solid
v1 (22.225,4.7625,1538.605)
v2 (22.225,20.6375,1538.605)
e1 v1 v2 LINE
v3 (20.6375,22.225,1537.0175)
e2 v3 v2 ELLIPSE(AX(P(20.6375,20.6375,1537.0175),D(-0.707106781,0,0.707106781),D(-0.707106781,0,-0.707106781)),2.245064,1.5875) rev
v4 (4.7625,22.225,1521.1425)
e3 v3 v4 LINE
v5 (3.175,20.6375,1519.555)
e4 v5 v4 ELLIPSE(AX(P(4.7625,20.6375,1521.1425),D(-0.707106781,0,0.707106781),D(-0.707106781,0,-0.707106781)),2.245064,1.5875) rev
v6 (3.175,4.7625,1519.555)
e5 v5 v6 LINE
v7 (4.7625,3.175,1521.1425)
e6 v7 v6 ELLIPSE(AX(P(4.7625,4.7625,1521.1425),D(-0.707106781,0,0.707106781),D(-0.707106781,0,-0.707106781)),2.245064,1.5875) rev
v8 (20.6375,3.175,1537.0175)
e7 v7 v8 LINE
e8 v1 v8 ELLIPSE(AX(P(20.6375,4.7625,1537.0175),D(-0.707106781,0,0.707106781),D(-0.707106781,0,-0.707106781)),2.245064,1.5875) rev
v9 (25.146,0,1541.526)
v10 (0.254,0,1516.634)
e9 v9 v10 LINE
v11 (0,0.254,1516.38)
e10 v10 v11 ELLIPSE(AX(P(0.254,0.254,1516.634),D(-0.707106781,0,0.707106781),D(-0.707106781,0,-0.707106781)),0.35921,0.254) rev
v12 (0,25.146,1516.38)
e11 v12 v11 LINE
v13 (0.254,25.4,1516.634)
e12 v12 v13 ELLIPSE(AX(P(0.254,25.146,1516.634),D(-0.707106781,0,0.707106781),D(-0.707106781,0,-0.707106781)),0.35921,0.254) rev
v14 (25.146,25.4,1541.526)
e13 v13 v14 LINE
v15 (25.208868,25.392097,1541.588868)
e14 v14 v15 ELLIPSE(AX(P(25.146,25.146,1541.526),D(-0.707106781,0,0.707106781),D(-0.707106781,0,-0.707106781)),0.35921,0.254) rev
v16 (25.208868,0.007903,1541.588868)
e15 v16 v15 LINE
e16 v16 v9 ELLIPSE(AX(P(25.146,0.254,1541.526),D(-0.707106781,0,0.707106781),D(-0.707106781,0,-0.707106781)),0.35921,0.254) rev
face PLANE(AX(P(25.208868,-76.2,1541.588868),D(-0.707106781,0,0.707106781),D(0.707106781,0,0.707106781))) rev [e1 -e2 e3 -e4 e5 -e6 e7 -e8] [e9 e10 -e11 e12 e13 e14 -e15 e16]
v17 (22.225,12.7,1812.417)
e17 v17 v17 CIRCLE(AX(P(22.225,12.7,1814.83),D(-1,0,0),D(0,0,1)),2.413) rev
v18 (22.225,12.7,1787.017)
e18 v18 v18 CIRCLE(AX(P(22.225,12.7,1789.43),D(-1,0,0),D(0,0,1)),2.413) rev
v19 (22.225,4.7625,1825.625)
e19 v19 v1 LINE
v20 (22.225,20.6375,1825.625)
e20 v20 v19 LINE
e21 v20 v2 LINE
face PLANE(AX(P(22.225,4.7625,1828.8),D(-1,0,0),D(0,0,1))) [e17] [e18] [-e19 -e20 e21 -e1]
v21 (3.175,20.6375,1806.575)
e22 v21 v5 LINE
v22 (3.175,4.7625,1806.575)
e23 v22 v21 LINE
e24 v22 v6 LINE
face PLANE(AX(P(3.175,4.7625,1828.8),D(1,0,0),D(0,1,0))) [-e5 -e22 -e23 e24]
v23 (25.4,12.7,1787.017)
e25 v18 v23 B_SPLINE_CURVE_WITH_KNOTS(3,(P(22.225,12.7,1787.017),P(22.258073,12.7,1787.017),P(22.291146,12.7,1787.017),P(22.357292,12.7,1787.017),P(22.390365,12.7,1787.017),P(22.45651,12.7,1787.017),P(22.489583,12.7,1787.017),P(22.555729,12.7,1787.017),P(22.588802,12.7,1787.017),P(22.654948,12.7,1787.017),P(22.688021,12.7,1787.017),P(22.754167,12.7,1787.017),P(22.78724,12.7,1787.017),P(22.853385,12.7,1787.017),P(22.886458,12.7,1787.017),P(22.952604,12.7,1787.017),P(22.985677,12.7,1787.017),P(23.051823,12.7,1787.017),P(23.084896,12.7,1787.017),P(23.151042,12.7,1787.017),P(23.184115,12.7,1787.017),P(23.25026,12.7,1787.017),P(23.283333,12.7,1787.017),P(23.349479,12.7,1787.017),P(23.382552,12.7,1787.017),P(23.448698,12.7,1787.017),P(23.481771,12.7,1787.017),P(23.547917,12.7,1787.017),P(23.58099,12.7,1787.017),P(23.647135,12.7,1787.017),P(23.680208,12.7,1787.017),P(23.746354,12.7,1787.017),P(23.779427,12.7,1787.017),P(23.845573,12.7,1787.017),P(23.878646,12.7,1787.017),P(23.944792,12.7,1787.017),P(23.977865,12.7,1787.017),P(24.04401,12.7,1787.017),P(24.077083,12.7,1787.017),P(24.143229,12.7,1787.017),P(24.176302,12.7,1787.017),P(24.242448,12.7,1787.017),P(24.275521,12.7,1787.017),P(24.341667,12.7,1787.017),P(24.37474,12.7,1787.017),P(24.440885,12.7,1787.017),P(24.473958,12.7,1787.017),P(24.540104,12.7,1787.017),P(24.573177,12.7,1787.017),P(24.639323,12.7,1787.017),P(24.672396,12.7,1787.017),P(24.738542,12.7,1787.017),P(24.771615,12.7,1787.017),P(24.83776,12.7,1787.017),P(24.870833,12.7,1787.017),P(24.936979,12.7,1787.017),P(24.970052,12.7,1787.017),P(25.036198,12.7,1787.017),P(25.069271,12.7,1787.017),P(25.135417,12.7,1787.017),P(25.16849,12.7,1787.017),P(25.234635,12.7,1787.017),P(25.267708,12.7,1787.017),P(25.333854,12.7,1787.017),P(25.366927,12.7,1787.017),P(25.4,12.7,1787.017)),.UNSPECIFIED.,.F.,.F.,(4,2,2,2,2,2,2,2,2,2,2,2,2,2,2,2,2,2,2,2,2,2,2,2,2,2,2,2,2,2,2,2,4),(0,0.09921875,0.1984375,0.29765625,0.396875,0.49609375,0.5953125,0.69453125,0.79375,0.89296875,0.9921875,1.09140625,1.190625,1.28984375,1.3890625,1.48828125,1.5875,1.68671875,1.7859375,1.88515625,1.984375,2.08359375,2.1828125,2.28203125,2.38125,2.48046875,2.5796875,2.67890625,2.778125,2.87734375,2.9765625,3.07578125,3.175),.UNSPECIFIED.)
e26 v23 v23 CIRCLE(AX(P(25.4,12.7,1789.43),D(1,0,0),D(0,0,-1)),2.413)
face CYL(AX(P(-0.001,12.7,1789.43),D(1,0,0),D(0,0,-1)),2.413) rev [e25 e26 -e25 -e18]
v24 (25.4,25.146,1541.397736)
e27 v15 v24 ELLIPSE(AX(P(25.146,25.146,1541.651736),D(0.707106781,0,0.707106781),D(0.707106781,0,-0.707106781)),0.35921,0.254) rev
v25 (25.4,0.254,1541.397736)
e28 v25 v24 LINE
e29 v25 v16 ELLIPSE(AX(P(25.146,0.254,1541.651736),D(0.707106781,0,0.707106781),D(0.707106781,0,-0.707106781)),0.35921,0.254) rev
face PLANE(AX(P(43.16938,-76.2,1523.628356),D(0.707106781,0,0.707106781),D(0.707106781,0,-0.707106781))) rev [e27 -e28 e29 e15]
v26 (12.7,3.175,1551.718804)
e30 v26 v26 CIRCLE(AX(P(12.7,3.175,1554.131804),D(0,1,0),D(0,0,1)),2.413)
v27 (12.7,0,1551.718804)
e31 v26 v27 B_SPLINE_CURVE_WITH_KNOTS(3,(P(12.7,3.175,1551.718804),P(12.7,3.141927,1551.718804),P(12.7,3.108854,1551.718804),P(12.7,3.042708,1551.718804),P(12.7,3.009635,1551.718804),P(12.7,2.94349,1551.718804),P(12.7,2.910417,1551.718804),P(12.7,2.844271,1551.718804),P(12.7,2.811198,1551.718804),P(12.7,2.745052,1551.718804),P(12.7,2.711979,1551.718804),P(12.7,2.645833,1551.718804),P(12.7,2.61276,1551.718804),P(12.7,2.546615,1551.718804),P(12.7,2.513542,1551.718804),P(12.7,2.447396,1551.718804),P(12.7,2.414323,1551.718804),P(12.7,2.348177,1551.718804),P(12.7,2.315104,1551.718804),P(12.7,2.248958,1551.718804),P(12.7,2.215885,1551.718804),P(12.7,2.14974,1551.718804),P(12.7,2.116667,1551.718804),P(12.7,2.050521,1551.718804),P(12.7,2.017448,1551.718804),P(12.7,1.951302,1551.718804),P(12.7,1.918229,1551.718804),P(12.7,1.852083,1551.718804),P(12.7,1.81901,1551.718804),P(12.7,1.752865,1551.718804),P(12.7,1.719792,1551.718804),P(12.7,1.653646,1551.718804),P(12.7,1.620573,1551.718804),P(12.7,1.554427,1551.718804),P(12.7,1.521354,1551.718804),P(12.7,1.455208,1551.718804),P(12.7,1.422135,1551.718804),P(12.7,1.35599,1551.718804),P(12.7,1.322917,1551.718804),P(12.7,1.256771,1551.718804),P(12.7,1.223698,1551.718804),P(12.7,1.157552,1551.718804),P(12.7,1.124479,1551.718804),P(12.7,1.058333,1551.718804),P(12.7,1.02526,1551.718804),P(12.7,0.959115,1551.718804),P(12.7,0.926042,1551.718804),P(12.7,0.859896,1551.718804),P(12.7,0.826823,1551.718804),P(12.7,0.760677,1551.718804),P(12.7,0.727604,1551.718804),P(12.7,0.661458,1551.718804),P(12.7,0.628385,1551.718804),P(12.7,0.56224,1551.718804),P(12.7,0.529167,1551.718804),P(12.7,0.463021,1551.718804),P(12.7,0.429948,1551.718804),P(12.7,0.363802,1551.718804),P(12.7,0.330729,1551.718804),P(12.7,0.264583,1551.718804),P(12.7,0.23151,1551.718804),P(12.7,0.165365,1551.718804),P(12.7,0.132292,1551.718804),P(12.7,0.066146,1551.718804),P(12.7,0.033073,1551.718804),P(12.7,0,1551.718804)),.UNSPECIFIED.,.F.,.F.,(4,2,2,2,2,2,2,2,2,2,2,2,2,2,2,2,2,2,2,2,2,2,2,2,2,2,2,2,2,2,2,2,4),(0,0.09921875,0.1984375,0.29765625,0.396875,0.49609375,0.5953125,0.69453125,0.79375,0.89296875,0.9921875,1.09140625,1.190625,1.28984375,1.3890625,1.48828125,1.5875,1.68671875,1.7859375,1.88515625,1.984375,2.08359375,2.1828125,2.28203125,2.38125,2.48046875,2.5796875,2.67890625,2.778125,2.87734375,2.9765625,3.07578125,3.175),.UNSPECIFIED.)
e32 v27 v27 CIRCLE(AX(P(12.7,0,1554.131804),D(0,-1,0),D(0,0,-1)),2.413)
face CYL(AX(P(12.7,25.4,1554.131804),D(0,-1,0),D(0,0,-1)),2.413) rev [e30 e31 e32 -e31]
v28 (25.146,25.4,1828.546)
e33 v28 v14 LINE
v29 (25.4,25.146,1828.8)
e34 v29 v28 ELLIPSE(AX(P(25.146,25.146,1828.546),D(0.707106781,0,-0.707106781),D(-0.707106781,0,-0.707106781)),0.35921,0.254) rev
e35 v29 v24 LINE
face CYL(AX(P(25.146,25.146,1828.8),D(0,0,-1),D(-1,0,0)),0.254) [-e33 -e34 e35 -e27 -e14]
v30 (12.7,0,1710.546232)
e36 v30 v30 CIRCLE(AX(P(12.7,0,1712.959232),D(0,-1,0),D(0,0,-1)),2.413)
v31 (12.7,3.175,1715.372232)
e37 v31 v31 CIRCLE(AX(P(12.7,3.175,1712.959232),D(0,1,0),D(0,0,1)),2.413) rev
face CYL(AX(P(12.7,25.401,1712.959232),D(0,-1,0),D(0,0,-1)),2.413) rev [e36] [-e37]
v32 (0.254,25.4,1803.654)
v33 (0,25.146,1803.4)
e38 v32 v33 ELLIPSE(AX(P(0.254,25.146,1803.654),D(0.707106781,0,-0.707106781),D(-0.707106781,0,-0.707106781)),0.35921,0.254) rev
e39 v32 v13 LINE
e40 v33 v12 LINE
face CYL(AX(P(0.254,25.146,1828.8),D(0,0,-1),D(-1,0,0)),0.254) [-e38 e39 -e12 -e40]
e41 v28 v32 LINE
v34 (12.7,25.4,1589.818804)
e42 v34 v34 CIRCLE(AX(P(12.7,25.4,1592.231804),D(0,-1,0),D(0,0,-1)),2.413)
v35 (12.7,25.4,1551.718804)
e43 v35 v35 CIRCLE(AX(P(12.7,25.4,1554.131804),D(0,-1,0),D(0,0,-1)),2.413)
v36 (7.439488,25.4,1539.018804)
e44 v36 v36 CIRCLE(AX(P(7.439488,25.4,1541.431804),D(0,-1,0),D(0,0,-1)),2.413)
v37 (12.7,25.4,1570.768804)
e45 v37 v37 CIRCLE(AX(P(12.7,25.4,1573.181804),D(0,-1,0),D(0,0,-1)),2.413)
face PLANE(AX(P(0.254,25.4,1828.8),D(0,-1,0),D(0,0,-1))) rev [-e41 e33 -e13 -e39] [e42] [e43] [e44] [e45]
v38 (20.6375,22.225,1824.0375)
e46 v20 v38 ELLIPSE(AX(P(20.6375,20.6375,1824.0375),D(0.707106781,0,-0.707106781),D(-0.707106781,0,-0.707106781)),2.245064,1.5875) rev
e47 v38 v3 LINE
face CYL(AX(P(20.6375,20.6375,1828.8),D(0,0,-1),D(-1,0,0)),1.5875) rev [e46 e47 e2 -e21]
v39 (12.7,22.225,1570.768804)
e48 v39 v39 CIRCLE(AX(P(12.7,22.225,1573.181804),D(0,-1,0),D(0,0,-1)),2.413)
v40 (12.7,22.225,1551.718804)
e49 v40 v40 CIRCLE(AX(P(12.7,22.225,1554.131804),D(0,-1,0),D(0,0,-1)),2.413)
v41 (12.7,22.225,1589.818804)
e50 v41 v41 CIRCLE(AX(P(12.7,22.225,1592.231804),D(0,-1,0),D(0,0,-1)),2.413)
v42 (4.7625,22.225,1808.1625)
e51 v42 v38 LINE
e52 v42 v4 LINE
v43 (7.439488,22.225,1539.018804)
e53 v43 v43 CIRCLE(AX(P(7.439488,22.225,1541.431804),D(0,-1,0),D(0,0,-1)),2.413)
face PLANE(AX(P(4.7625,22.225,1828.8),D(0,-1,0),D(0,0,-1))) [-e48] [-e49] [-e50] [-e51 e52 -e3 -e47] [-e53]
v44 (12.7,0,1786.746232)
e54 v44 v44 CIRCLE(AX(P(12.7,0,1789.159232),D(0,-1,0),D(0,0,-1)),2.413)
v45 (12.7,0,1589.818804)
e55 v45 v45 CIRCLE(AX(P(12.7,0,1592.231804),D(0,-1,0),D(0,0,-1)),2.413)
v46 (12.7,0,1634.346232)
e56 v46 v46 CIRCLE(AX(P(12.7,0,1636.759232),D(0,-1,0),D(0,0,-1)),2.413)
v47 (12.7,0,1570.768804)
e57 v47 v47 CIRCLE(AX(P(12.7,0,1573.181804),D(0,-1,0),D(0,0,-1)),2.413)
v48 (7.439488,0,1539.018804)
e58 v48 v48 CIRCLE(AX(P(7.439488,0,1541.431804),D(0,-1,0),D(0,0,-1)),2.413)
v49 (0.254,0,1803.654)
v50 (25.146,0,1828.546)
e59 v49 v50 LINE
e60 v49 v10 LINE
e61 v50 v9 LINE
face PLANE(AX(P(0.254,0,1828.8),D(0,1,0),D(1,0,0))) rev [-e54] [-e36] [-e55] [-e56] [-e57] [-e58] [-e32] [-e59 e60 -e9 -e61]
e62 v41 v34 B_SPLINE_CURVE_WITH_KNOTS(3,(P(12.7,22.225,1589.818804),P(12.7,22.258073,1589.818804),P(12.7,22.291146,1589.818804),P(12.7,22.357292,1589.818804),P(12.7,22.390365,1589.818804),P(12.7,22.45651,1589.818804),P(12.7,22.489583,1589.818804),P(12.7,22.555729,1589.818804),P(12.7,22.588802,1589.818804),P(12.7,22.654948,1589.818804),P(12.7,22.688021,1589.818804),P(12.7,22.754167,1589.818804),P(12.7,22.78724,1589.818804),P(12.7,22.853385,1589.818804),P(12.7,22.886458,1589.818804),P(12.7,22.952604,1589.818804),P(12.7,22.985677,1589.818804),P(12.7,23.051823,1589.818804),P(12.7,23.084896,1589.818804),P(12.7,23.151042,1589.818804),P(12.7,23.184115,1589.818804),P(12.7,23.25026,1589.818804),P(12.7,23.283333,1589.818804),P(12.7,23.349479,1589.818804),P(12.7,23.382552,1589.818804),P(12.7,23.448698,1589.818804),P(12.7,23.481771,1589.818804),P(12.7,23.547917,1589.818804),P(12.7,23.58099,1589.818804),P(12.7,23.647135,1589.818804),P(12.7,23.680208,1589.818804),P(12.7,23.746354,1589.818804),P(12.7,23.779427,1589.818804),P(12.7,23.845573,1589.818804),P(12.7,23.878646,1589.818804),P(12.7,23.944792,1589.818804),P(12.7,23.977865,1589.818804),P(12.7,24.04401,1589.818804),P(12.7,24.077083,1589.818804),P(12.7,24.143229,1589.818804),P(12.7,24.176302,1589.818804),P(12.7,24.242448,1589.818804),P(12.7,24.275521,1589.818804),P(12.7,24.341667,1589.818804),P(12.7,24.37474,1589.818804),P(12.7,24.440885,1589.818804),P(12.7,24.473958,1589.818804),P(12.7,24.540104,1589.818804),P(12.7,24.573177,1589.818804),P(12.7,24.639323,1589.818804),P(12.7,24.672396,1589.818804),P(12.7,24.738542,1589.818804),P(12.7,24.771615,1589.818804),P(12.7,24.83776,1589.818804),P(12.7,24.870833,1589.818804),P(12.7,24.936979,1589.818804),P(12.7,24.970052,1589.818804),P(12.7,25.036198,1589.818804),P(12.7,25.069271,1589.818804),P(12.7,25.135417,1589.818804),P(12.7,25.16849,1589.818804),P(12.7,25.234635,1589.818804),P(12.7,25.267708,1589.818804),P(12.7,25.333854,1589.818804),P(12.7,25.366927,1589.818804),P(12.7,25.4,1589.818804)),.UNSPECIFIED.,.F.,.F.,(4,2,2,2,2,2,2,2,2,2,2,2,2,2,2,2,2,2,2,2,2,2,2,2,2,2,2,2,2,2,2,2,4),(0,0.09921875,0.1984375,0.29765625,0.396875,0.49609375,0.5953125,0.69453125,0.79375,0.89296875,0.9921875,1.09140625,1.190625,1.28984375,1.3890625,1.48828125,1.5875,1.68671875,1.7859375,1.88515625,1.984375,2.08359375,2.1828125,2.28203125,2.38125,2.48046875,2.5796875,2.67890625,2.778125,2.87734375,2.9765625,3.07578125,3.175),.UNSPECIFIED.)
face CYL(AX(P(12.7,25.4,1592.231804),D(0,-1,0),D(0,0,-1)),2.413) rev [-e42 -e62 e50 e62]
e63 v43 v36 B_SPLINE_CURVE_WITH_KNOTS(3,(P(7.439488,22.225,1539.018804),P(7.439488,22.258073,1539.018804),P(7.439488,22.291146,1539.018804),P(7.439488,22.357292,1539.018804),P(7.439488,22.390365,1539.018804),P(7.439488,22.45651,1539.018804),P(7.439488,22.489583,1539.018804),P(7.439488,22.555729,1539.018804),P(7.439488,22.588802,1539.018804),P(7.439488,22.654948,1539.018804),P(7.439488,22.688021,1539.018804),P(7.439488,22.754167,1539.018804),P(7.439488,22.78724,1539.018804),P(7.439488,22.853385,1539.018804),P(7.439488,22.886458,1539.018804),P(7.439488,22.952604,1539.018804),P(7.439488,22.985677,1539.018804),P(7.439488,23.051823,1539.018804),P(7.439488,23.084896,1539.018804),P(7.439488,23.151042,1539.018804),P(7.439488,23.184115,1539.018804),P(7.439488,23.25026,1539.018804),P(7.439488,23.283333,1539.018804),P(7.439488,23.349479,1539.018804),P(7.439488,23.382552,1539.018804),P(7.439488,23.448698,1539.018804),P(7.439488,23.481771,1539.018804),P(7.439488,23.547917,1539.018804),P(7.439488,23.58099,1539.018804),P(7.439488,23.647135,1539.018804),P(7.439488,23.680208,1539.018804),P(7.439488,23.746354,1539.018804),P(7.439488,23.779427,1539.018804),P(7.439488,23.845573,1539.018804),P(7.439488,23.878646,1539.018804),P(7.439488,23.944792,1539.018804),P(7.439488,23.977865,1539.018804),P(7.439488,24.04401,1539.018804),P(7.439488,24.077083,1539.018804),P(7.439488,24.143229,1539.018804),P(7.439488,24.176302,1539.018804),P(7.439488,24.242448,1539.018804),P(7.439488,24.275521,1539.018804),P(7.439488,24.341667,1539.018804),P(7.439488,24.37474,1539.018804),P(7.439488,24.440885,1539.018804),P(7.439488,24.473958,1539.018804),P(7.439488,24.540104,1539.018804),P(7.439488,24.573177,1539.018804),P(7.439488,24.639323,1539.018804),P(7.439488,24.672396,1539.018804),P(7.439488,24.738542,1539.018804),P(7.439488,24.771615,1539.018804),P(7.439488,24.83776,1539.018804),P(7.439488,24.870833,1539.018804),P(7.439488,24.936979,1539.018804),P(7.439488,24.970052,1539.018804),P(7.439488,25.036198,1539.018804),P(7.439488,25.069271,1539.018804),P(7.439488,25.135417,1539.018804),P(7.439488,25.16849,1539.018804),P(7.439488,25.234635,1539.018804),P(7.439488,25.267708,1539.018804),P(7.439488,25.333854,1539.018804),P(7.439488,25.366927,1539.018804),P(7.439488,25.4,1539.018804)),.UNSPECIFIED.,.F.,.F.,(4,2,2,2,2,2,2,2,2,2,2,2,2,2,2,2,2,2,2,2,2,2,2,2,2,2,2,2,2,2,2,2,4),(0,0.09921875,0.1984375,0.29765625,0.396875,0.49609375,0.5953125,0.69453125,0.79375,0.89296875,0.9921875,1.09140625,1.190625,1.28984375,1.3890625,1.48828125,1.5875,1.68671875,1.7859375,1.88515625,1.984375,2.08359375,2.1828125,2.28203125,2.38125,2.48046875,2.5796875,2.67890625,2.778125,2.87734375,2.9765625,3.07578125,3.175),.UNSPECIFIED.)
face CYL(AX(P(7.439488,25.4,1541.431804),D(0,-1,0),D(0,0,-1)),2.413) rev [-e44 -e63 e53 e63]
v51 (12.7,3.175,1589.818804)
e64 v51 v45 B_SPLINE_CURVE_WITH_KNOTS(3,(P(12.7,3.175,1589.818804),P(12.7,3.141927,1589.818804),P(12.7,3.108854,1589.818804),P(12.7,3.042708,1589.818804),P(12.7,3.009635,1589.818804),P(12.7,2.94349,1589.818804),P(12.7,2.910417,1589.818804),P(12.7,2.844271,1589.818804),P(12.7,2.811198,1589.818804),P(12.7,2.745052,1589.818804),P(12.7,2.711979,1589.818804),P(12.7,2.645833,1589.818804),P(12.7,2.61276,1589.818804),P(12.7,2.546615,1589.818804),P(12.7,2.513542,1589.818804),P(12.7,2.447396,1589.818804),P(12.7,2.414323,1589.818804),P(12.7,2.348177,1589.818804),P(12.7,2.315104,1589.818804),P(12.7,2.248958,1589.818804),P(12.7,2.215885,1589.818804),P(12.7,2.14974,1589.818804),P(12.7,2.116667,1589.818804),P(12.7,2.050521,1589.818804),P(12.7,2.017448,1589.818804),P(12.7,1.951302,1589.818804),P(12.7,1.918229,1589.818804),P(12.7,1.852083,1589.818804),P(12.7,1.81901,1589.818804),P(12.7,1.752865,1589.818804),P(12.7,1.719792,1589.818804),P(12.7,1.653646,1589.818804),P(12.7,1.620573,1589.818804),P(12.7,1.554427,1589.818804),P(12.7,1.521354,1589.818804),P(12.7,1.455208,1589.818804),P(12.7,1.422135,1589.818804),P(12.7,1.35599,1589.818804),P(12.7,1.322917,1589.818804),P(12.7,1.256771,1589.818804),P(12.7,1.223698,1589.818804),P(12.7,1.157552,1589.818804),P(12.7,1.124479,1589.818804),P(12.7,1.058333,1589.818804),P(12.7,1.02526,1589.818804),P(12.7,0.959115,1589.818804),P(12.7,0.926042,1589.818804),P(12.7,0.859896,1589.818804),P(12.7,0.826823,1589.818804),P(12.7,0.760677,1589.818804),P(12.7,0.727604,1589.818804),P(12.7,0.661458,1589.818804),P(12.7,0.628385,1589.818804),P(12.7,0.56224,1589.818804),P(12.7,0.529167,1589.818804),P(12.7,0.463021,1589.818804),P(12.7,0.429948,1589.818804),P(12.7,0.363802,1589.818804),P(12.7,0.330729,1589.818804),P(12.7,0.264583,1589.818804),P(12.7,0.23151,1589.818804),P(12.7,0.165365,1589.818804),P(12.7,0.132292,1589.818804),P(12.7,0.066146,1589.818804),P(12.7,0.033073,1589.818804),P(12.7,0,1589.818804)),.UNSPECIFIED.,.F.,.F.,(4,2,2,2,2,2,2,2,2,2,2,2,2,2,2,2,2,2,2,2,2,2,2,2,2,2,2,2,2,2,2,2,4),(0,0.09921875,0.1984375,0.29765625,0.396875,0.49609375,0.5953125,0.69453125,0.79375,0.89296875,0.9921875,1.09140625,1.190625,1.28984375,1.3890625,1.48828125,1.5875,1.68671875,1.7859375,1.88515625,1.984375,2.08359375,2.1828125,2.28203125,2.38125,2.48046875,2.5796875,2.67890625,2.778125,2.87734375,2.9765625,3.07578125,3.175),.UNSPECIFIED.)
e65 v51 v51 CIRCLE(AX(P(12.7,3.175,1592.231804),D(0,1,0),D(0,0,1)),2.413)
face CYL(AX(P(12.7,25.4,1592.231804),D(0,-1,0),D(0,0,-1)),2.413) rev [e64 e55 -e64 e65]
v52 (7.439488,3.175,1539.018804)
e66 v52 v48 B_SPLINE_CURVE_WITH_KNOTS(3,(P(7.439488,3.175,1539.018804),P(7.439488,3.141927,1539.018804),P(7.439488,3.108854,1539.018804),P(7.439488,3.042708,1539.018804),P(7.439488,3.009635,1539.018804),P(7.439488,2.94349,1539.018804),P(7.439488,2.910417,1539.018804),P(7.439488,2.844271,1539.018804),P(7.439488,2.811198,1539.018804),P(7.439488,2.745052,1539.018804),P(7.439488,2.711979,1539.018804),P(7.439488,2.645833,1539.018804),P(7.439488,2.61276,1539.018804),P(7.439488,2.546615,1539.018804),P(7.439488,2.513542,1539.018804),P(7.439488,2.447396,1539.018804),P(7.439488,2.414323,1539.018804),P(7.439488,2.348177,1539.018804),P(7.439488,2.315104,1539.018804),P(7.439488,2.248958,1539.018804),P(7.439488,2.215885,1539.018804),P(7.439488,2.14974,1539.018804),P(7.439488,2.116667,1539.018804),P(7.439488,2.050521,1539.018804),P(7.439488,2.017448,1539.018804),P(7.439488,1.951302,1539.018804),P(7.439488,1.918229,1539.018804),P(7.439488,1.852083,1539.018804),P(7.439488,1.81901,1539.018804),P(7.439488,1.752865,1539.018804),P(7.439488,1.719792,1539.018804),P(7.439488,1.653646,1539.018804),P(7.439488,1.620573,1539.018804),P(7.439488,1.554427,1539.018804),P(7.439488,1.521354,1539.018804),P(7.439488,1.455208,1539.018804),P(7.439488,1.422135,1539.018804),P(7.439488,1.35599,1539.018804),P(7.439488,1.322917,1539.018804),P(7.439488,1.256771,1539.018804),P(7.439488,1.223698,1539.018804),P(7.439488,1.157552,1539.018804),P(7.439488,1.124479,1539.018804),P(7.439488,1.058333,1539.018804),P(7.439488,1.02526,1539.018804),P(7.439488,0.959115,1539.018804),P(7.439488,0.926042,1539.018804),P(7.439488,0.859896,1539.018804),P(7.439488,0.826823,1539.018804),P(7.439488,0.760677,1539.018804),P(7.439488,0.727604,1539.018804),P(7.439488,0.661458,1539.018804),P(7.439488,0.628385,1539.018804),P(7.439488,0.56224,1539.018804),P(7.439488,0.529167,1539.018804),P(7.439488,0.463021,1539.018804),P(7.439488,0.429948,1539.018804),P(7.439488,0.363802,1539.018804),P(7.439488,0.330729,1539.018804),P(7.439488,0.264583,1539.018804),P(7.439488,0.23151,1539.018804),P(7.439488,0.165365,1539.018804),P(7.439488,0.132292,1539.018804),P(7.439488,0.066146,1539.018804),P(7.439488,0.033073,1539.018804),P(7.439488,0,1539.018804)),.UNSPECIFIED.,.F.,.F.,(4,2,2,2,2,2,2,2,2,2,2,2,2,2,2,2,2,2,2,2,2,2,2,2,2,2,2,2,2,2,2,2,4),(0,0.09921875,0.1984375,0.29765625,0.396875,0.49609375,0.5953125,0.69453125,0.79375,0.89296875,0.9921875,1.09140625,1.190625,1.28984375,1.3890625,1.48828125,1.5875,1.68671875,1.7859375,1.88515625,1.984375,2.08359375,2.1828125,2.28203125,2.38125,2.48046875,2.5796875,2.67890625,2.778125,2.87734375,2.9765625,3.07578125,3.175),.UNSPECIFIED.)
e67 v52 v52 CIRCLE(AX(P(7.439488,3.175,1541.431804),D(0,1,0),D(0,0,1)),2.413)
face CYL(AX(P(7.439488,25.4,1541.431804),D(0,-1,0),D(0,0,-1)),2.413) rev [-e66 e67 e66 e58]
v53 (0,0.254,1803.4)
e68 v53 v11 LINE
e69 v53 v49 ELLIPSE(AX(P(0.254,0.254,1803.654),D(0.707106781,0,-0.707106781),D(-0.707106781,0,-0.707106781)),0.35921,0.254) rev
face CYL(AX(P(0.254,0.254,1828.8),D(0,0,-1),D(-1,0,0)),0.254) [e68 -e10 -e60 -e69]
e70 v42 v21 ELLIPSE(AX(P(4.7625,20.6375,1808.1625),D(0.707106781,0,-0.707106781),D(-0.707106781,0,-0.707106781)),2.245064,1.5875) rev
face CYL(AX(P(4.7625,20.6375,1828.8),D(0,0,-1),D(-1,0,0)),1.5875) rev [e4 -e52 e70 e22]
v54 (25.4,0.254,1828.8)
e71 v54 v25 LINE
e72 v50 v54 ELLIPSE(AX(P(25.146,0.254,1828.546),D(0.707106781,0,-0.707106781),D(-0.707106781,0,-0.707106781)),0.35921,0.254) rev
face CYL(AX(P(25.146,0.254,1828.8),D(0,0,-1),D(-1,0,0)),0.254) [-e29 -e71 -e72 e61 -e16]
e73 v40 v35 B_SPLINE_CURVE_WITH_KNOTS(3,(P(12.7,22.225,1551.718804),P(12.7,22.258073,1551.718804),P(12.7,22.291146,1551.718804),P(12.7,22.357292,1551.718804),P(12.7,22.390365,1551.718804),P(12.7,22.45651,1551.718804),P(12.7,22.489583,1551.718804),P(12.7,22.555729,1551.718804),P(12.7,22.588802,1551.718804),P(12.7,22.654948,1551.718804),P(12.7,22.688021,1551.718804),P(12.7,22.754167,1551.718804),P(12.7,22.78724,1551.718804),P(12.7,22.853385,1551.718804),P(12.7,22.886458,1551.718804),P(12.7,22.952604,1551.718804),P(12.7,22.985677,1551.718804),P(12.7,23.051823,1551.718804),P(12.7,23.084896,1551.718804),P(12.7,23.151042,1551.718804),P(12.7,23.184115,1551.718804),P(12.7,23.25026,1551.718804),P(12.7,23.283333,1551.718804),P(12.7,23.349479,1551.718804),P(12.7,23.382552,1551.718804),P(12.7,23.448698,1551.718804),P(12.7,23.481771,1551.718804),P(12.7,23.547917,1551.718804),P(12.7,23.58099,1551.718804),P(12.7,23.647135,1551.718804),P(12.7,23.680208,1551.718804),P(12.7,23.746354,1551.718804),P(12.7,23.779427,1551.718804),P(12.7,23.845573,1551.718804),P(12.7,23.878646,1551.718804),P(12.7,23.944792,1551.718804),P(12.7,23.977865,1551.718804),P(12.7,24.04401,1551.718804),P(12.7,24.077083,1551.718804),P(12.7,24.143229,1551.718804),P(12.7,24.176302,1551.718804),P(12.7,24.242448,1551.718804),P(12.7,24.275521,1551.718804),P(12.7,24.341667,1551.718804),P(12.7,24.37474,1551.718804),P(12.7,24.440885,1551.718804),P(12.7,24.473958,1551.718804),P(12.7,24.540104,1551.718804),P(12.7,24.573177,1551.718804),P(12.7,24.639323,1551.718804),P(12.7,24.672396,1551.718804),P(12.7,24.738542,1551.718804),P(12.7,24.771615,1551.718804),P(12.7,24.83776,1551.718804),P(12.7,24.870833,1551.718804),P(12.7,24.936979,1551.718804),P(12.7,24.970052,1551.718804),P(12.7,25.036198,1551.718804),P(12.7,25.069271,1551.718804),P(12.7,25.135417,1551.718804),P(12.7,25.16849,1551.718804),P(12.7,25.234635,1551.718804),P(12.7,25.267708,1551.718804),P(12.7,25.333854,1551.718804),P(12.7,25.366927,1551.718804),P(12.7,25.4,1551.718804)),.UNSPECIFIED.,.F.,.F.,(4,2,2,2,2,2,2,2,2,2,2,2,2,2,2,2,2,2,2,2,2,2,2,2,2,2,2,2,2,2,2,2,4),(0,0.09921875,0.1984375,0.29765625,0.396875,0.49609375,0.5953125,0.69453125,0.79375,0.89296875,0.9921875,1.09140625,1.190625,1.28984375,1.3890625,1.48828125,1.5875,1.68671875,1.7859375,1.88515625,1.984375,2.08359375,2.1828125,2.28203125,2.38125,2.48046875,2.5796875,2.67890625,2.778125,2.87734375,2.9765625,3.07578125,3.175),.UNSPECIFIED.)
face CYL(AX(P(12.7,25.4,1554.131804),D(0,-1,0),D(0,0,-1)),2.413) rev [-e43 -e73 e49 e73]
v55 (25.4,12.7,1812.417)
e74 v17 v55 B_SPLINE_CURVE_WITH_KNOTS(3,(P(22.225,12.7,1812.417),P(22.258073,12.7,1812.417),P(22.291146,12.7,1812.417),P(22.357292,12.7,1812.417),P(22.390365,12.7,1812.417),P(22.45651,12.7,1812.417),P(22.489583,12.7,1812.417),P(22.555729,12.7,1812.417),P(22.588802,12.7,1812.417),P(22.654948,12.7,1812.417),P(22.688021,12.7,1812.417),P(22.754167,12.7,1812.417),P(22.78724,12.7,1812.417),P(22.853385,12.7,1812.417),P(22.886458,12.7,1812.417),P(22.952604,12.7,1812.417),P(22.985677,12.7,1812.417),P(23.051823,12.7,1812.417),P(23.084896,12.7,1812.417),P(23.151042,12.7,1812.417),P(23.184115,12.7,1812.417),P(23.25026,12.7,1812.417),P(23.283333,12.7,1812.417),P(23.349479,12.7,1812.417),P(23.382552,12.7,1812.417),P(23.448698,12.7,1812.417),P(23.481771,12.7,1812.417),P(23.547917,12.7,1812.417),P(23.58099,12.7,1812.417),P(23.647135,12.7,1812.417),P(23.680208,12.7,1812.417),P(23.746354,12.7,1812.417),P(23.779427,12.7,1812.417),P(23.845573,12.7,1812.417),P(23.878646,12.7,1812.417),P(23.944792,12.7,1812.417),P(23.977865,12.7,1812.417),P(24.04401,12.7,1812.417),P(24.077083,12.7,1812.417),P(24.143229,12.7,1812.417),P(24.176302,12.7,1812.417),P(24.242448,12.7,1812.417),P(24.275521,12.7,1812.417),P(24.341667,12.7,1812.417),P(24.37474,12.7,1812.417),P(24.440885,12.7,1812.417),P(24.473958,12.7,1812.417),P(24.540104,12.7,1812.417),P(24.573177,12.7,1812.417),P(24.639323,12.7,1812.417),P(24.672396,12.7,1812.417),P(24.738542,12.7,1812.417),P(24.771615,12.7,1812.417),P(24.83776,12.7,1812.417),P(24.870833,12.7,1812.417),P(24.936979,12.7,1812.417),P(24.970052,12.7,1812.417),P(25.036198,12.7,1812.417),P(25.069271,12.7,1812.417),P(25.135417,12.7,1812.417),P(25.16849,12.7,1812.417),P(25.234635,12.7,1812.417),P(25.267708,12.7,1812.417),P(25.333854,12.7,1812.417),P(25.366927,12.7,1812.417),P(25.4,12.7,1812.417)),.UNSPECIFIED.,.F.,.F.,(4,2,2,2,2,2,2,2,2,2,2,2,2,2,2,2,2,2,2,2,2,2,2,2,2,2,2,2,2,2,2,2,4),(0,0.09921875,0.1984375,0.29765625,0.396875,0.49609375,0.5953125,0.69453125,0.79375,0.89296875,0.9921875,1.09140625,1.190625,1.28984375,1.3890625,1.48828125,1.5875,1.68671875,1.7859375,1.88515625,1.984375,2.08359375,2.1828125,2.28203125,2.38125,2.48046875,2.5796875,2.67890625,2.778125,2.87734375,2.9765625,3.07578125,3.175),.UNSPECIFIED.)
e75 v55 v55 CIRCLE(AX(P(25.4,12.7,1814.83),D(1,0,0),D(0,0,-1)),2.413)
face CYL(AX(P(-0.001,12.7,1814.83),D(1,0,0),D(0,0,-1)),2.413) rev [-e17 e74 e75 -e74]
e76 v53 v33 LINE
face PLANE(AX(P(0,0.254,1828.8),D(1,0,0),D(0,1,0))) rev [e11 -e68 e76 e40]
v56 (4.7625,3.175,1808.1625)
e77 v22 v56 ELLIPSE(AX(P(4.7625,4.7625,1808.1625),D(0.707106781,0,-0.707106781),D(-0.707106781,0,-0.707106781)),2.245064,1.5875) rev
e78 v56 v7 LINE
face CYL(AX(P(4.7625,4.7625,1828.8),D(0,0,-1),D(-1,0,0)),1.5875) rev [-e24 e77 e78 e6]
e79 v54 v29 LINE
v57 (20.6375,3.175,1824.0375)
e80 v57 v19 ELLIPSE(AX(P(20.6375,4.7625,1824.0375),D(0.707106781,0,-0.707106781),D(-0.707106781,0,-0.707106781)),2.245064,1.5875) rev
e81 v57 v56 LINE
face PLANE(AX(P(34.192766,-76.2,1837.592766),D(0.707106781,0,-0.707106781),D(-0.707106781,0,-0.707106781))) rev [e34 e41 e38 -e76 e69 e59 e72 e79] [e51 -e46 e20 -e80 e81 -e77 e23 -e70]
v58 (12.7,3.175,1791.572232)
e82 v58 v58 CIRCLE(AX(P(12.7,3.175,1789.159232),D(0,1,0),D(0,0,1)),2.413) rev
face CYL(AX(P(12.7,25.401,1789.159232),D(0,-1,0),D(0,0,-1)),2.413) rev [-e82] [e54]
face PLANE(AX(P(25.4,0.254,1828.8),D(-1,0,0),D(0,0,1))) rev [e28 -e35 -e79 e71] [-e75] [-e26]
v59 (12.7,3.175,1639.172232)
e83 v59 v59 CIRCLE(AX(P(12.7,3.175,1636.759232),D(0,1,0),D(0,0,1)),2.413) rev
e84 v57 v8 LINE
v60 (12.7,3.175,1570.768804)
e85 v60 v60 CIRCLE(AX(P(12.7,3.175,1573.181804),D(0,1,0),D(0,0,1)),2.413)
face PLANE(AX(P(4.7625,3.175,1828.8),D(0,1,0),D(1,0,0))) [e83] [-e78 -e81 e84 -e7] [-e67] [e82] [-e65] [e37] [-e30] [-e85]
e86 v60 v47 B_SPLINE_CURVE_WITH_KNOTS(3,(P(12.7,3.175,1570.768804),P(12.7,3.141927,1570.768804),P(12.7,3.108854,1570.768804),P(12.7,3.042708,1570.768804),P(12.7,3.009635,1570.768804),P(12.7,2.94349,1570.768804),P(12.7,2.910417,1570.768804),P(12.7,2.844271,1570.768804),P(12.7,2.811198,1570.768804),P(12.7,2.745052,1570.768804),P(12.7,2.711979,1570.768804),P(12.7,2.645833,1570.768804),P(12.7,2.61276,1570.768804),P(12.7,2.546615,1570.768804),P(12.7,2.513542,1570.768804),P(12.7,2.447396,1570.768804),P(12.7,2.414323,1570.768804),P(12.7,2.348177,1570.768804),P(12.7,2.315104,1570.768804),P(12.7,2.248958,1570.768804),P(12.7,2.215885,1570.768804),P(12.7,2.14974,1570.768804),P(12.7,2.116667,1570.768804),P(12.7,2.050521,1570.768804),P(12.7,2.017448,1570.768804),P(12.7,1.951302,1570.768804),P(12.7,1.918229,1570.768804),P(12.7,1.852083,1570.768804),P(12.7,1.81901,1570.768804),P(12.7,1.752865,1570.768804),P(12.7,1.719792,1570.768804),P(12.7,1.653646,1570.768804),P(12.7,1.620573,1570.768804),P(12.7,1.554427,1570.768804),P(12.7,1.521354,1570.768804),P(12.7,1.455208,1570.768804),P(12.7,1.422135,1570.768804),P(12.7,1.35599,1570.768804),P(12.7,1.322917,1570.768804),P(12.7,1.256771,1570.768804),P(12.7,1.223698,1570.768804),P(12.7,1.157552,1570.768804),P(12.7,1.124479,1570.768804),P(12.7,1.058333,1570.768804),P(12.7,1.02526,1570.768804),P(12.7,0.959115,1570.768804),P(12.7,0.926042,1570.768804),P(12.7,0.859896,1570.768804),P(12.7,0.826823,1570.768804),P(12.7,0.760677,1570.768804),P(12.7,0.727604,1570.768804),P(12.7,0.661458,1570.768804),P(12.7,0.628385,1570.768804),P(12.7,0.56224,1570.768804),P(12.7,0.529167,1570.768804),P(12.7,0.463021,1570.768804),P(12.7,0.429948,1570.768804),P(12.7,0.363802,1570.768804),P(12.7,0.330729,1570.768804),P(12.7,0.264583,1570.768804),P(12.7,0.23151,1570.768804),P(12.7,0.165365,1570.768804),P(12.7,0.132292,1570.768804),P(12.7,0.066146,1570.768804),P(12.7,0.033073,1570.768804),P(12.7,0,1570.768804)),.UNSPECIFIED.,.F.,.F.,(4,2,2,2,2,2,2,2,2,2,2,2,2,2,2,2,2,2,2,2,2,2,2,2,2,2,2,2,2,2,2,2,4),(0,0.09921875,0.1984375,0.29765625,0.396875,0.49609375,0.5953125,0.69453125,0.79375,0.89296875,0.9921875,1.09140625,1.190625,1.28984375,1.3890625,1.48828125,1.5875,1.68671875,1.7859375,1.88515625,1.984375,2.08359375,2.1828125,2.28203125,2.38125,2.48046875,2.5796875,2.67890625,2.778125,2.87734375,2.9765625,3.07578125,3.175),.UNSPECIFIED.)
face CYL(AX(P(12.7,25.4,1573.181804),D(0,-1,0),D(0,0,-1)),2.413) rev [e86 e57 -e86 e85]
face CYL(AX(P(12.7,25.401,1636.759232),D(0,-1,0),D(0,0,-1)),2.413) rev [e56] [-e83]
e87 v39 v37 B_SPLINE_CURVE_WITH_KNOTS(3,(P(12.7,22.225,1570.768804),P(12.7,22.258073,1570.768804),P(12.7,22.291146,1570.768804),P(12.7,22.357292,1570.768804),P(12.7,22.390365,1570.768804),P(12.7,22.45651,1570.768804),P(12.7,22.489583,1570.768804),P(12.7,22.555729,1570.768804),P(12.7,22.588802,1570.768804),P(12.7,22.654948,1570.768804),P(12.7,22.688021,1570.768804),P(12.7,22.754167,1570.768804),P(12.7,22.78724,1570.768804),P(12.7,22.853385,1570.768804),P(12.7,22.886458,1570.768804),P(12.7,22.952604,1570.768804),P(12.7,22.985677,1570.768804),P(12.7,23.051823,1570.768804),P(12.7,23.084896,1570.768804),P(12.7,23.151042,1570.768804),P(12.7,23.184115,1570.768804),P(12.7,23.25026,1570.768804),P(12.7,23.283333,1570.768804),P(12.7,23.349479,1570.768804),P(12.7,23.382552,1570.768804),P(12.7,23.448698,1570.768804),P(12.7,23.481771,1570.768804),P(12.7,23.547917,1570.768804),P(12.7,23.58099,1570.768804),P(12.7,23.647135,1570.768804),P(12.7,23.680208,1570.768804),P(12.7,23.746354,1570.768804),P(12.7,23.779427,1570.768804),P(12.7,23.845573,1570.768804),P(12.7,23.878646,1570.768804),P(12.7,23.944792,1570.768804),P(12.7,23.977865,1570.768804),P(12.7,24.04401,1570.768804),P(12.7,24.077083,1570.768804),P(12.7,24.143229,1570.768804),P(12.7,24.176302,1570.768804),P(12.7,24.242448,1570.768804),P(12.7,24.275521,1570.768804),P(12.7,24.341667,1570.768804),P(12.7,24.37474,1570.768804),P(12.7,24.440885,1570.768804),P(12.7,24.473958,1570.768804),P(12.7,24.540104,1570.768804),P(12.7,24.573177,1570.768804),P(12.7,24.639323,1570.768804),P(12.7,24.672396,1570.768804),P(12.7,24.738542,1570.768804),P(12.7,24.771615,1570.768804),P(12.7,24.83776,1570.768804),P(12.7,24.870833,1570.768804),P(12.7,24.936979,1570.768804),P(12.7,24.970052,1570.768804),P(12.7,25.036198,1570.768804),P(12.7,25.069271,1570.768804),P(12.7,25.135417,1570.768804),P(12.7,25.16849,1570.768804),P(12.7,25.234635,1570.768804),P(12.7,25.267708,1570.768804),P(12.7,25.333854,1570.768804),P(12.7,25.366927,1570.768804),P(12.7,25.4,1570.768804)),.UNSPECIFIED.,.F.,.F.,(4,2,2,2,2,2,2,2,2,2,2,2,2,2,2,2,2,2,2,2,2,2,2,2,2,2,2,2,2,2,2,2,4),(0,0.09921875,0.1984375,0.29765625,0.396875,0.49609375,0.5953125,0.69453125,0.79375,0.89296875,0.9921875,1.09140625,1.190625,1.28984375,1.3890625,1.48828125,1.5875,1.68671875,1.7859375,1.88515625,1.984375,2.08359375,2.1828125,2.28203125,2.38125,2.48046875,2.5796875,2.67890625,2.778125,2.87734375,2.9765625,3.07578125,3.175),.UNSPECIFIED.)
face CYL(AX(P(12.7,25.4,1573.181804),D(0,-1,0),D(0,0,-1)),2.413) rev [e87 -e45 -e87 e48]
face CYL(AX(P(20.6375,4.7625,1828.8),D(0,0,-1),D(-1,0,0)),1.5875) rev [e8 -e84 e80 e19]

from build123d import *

# Parameters (mm, degrees)
CUT_EXTRUDE1_START = 1516.38
CUT_EXTRUDE1_DEPTH = 312.42
CUT_EXTRUDE2_REACH = 1831.153
CUT_EXTRUDE3_REACH = 1831.153
SKETCH5_R          = 2.413
CUT_EXTRUDE5_DEPTH = 1830.152743759
CUT_EXTRUDE7_REACH = 1831.153
SKETCH8_R          = 2.413
CUT_EXTRUDE8_REACH = 1831.153
SKETCH9_R          = 2.413


with BuildPart() as part:
    # Cut-Extrude1: read off the stored shape, not the designer's step
    # Cut-Extrude1 outline → Cut-Extrude1 (new body)
    with BuildSketch(Plane.XY.offset(CUT_EXTRUDE1_START)):
        with BuildLine():
            Line((0, 25.146), (0, 0.254))
            ThreePointArc((0, 0.254), (0.074394878, 0.074394878), (0.254, 0))
            Line((0.254, 0), (25.146, 0))
            ThreePointArc((25.146, 0), (25.325605122, 0.074394878), (25.4, 0.254))
            Line((25.4, 0.254), (25.4, 25.146))
            ThreePointArc((25.4, 25.146), (25.325605122, 25.325605122), (25.146, 25.4))
            Line((25.146, 25.4), (0.254, 25.4))
            ThreePointArc((0.254, 25.4), (0.074394878, 25.325605122), (0, 25.146))
        make_face()
        with BuildLine():
            ThreePointArc((4.7625, 3.175), (3.639967985, 3.639967985), (3.175, 4.7625))
            Line((3.175, 4.7625), (3.175, 20.6375))
            ThreePointArc((3.175, 20.6375), (3.639967985, 21.760032015), (4.7625, 22.225))
            Line((4.7625, 22.225), (20.6375, 22.225))
            ThreePointArc((20.6375, 22.225), (21.760032015, 21.760032015), (22.225, 20.6375))
            Line((22.225, 20.6375), (22.225, 4.7625))
            ThreePointArc((22.225, 4.7625), (21.760032015, 3.639967985), (20.6375, 3.175))
            Line((20.6375, 3.175), (4.7625, 3.175))
        make_face(mode=Mode.SUBTRACT)
    extrude(amount=CUT_EXTRUDE1_DEPTH)

    # Cut-Extrude2: up to this face of the body (flat: up to its plane)
    cut_extrude2_end = Plane(part.part.faces().sort_by_distance((12.7, 0, 1672.59))[0])
    # Sketch2 → Cut-Extrude2 (cut, up to the picked face)
    with BuildSketch(Plane(origin=(0, 25.4, 0), x_dir=(1, 0, 0), z_dir=(0, 1, 0)), mode=Mode.PRIVATE) as cut_extrude2_sk1:
        Polygon((43.169380192, -1523.628355708), (25.20886795, -1541.58886795), (-10.712156534, -1505.667843466), (7.248355708, -1487.707331224), align=None)
    cut_extrude2_tool1 = split(extrude(cut_extrude2_sk1.sketch, amount=-CUT_EXTRUDE2_REACH, mode=Mode.PRIVATE), bisect_by=cut_extrude2_end, keep=Keep.BOTH, mode=Mode.PRIVATE)
    add(cut_extrude2_tool1.solids().sort_by(Axis((16.228612, 25.4, 1514.6481), (0, -1, 0)))[0], mode=Mode.SUBTRACT)

    # Cut-Extrude3: up to this face of the body (flat: up to its plane)
    cut_extrude3_end = Plane(part.part.faces().sort_by_distance((12.527724859, 0, 1678.853862429))[0])
    # Sketch3 → Cut-Extrude3 (cut, up to the picked face)
    with BuildSketch(Plane(origin=(0, 25.4, 0), x_dir=(1, 0, 0), z_dir=(0, 1, 0)), mode=Mode.PRIVATE) as cut_extrude3_sk1:
        Polygon((34.192766306, -1837.592766306), (16.232254064, -1855.553278548), (-19.688770421, -1819.632254064), (-1.728258178, -1801.671741822), align=None)
    cut_extrude3_tool1 = split(extrude(cut_extrude3_sk1.sketch, amount=-CUT_EXTRUDE3_REACH, mode=Mode.PRIVATE), bisect_by=cut_extrude3_end, keep=Keep.BOTH, mode=Mode.PRIVATE)
    add(cut_extrude3_tool1.solids().sort_by(Axis((7.251998, 25.4, 1828.61251), (0, -1, 0)))[0], mode=Mode.SUBTRACT)

    # Sketch5 → Cut-Extrude5 (cut, through all)
    with BuildSketch(Plane.XZ):
        with Locations(Location((7.439487758, 1541.431804126, 0), (0, 0, 270))):
            Circle(SKETCH5_R)
        with Locations(Location((12.7, 1554.131804126, 0), (0, 0, 270))):
            Circle(SKETCH5_R)
        with Locations(Location((12.7, 1573.181804126, 0), (0, 0, 270))):
            Circle(SKETCH5_R)
        with Locations(Location((12.7, 1592.231804126, 0), (0, 0, 270))):
            Circle(SKETCH5_R)
    extrude(amount=-CUT_EXTRUDE5_DEPTH, mode=Mode.SUBTRACT)

    # Sketch8 → Cut-Extrude7 (cut, up to next)
    with BuildSketch(Plane(origin=(25.4, 0, 0), x_dir=(0, 0, -1), z_dir=(1, 0, 0)), mode=Mode.PRIVATE) as cut_extrude7_sk1:
        with Locations((-1814.83, 12.7)):
            Circle(SKETCH8_R)
    cut_extrude7_tool1 = extrude(cut_extrude7_sk1.sketch, amount=-CUT_EXTRUDE7_REACH, mode=Mode.PRIVATE) & part.part
    # Sketch8 → Cut-Extrude7 (cut, up to next)
    with BuildSketch(Plane(origin=(25.4, 0, 0), x_dir=(0, 0, -1), z_dir=(1, 0, 0)), mode=Mode.PRIVATE) as cut_extrude7_sk2:
        with Locations((-1789.43, 12.7)):
            Circle(SKETCH8_R)
    cut_extrude7_tool2 = extrude(cut_extrude7_sk2.sketch, amount=-CUT_EXTRUDE7_REACH, mode=Mode.PRIVATE) & part.part
    add(cut_extrude7_tool1.solids().sort_by_distance((25.4, 12.7, 1814.83))[0], mode=Mode.SUBTRACT)
    add(cut_extrude7_tool2.solids().sort_by_distance((25.4, 12.7, 1789.43))[0], mode=Mode.SUBTRACT)

    # Sketch9 → Cut-Extrude8 (cut, up to next)
    with BuildSketch(Plane.XZ, mode=Mode.PRIVATE) as cut_extrude8_sk1:
        with Locations(Location((12.7, 1789.159231637, 0), (0, 0, 270))):
            Circle(SKETCH9_R)
    cut_extrude8_tool1 = extrude(cut_extrude8_sk1.sketch, amount=-CUT_EXTRUDE8_REACH, mode=Mode.PRIVATE) & part.part
    # Sketch9 → Cut-Extrude8 (cut, up to next)
    with BuildSketch(Plane.XZ, mode=Mode.PRIVATE) as cut_extrude8_sk2:
        with Locations(Location((12.7, 1712.959231637, 0), (0, 0, 270))):
            Circle(SKETCH9_R)
    cut_extrude8_tool2 = extrude(cut_extrude8_sk2.sketch, amount=-CUT_EXTRUDE8_REACH, mode=Mode.PRIVATE) & part.part
    # Sketch9 → Cut-Extrude8 (cut, up to next)
    with BuildSketch(Plane.XZ, mode=Mode.PRIVATE) as cut_extrude8_sk3:
        with Locations(Location((12.7, 1636.759231637, 0), (0, 0, 270))):
            Circle(SKETCH9_R)
    cut_extrude8_tool3 = extrude(cut_extrude8_sk3.sketch, amount=-CUT_EXTRUDE8_REACH, mode=Mode.PRIVATE) & part.part
    add(cut_extrude8_tool1.solids().sort_by_distance((12.7, 0, 1789.159232))[0], mode=Mode.SUBTRACT)
    add(cut_extrude8_tool2.solids().sort_by_distance((12.7, 0, 1712.959232))[0], mode=Mode.SUBTRACT)
    add(cut_extrude8_tool3.solids().sort_by_distance((12.7, 0, 1636.759232))[0], mode=Mode.SUBTRACT)


solid = part.part
